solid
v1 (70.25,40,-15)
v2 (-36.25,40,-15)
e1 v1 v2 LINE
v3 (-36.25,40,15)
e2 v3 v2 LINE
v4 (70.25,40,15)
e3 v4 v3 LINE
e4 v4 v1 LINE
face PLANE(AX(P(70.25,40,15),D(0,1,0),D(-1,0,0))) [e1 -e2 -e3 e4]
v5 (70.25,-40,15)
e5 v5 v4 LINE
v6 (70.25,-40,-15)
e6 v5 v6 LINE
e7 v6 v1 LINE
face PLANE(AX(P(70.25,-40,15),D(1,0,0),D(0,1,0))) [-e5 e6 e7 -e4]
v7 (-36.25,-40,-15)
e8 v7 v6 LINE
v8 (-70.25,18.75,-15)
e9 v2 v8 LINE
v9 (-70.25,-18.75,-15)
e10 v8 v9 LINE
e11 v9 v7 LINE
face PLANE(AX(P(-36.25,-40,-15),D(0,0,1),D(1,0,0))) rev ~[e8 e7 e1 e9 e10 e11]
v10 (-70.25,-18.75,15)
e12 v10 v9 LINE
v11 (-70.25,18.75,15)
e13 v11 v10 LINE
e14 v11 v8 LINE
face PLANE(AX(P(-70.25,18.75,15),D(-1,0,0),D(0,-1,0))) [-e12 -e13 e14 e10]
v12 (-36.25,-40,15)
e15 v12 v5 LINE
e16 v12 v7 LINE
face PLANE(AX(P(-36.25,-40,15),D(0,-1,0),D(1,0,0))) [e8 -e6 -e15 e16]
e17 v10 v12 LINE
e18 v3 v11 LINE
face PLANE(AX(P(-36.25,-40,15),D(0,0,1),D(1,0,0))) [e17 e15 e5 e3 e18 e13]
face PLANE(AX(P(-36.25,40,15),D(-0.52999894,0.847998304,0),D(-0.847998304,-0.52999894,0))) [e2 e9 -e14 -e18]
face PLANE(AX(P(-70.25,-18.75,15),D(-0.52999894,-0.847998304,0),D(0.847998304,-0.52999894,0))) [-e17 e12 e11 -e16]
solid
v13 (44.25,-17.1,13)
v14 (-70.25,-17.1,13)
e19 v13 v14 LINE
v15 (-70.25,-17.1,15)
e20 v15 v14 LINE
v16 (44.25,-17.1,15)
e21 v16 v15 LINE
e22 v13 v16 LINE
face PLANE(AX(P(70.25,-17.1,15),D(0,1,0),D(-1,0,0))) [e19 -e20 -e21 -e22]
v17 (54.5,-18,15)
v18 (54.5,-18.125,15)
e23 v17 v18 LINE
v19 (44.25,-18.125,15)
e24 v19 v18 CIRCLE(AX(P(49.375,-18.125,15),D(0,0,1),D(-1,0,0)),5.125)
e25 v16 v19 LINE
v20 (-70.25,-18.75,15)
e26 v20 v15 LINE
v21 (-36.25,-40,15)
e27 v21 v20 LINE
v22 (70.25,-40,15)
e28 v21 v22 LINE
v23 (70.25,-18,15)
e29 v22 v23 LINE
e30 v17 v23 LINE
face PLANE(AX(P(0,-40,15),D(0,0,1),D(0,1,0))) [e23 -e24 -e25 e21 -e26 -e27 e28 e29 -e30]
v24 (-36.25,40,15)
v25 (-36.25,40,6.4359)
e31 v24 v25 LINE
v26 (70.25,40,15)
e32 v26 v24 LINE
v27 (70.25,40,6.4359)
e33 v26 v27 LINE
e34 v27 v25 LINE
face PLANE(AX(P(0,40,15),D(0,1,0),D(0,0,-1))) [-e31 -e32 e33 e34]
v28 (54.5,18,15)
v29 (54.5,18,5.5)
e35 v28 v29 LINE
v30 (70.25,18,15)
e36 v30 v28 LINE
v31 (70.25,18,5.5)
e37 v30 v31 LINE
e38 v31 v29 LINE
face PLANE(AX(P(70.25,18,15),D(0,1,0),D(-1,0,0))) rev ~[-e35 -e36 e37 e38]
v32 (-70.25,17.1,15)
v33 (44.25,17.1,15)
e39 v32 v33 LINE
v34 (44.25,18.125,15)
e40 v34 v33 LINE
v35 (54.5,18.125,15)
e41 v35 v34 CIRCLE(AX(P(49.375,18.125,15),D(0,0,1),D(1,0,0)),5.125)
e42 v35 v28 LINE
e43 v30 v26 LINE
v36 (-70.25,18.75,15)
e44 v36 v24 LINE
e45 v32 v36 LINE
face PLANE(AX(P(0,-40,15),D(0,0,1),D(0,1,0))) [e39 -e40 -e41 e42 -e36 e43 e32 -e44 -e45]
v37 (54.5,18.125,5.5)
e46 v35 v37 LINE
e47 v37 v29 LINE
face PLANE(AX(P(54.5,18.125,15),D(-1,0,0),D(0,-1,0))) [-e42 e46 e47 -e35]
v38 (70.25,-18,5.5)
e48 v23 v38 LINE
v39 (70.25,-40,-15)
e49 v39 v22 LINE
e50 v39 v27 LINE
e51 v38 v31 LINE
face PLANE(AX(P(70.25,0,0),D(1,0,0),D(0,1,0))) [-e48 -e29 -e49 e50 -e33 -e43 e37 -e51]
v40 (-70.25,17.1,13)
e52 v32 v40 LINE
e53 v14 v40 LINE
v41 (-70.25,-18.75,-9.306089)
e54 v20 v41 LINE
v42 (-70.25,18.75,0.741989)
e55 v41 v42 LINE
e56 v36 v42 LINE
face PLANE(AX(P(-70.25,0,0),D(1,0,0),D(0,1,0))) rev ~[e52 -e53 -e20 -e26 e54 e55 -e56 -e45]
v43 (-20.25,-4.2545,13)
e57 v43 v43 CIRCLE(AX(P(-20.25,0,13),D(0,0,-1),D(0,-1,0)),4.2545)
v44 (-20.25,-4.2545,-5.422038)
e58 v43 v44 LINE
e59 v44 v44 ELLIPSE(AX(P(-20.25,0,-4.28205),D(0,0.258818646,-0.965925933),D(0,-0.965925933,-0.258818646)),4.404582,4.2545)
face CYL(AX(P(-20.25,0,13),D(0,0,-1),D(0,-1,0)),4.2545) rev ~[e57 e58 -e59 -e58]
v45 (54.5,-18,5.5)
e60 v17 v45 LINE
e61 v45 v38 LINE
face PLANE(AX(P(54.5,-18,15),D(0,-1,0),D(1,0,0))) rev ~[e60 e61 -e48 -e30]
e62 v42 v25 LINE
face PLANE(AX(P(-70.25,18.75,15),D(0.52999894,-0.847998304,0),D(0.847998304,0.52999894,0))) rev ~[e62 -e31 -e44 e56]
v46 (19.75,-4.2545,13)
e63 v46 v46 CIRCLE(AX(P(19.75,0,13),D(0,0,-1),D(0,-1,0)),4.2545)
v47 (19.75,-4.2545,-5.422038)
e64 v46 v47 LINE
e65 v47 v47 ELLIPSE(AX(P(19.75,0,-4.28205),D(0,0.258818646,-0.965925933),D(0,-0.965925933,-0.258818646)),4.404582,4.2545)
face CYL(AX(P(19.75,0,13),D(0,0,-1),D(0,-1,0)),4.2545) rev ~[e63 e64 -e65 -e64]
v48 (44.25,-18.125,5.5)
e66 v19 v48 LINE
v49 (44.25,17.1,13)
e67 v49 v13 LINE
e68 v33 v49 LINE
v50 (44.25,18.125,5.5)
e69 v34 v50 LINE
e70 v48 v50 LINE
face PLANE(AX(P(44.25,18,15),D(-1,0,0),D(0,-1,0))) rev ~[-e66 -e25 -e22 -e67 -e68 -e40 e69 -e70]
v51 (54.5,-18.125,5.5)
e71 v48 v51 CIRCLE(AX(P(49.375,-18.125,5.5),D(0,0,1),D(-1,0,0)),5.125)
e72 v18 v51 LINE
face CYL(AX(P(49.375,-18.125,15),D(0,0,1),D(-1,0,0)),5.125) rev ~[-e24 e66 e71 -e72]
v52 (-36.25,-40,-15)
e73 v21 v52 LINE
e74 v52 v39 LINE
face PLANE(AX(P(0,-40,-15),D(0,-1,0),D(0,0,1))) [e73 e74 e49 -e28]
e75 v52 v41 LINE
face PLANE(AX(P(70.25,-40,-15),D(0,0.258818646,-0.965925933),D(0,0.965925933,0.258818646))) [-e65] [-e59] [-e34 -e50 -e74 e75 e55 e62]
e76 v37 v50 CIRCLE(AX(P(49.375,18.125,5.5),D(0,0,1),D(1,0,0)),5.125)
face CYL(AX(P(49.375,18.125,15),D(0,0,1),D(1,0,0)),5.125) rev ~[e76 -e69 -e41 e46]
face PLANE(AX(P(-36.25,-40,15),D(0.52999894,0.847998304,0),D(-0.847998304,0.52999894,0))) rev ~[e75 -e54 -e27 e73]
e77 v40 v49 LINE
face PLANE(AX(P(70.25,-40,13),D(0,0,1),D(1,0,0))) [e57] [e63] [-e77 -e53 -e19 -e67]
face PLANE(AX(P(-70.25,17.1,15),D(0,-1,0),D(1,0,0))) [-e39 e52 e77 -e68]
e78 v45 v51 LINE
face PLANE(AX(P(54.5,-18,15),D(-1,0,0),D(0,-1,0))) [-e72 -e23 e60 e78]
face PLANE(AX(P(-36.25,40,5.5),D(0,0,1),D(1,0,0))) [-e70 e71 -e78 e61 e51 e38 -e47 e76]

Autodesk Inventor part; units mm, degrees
ref_plane "Work Plane1" through (-36.25, -40, 32.5387) normal (0, 0, -1) x (-1, 0, 0)
ref_plane "Work Plane2" through (76.2, 29.3539, 8.396) normal (0, 0, 1) x (0, -1, 0)
ref_plane "Work Plane3" through (76.2, -6.1938, -1.129) normal (0, 0, 1) x (0, -1, 0)
sketch "Sketch1" plane through (0, 0, 0) normal (1, 0, 0) x (0, 1, 0)
  line L0 (-40, 15) -> (40, 15)
  line L1 (40, 15) -> (40, -15)
  line L2 (40, -15) -> (-40, -15)
  line L3 (-40, -15) -> (-40, 15)
  line L4 (-40, 15) -> (40, -15) construction
  line L5 (40, 15) -> (-40, -15) construction
  point P0 (0, 0)
  dimension "d0" = 30
  dimension "d1" = 80
extrude "Extrusion1" add sketch "Sketch1" along normal mid plane 140.5
sketch "Sketch2" plane through (-70.25, -40, 15) normal (0, 0, 1) x (1, 0, 0)
  line L0 (140.5, 80) -> (0, 80) construction
  line L1 (0, 0) -> (0, 80) construction
  line L2 (0, 80) -> (0, 58.75)
  line L3 (0, 58.75) -> (34, 80)
  line L4 (34, 80) -> (0, 80)
  line L5 (0, 21.25) -> (0, 0)
  line L6 (0, 0) -> (34, 0)
  line L7 (34, 0) -> (0, 21.25)
  point P0 (70.25, 40)
  dimension "d4" = 37.5
  dimension "d5" = 106.5
  dimension "d6" = 147.995
extrude "Extrusion2" cut sketch "Sketch2" against normal through all
sketch "Sketch3" plane through (70.25, -40, 15) normal (0, 0, 1) x (1, 0, 0)
  line L0 (0, 80) -> (0, 0) construction
  line L1 (-140.5, 21.25) -> (-140.5, 58.75) construction
  line L2 (-140.5, 57.1) -> (0, 57.1)
  line L3 (0, 57.1) -> (0, 22.9)
  line L4 (0, 22.9) -> (-140.5, 22.9)
  line L5 (-140.5, 22.9) -> (-140.5, 57.1)
  point P0 (-70.25, 40)
  point P1 (-140.5, 40)
  dimension "d9" = 34.2
extrude "Extrusion3" cut sketch "Sketch3" against normal blind 2
sketch "Sketch4" plane through (-36.25, 40, 15) normal (0, 0, 1) x (1, 0, 0)
  line L0 (106.5, -57.1) -> (-34, -57.1) construction
  line L1 (-34, -58.75) -> (-34, -57.1) construction
  line L2 (-34, -58.75) -> (0, -80) construction
  line L3 (0, -80) -> (106.5, -80) construction
  line L4 (106.5, -57.1) -> (106.5, -80) construction
  line L5 (-34, -22.9) -> (106.5, -22.9) construction
  line L6 (-34, -57.1) -> (-34, -22.9) construction
  line L7 (106.5, -57.1) -> (-34, -57.1) construction
  line L8 (106.5, -22.9) -> (106.5, -57.1) construction
  line L9 (106.5, -22) -> (80.5, -22)
  line L10 (80.5, -22) -> (80.5, -58)
  line L11 (80.5, -58) -> (106.5, -58)
  line L12 (106.5, -58) -> (106.5, -22)
  line L13 (85.625, -21.875) -> (85.625, -58.125) construction
  line L14 (90.75, -21.875) -> (90.75, -58.125)
  line L15 (80.5, -58.125) -> (80.5, -21.875)
  arc A0 (90.75, -21.875) -> (80.5, -21.875) centre (85.625, -21.875) ccw
  arc A1 (80.5, -58.125) -> (90.75, -58.125) centre (85.625, -58.125) ccw
  point P0 (36.25, -40)
  point P1 (106.5, -40)
  point P2 (85.625, -40)
  point P3 (80.5, -40)
  dimension "d12" = 36
  dimension "d13" = 26
  dimension "d14" = 46.5
  dimension "d15" = 15.75
extrude "Extrusion4" cut sketch "Sketch4" against normal blind 9.5
sketch "Sketch5" plane through (70.25, -40, 13) normal (0, 0, 1) x (1, 0, 0)
  line L0 (-26, 22.9) -> (-26, 57.1) construction
  line L1 (-15.75, 58) -> (0, 58) construction
  line L2 (-15.75, 58.125) -> (-15.75, 58) construction
  arc A0 (-15.75, 58.125) -> (-26, 58.125) centre (-20.875, 58.125) ccw construction
  line L3 (-26, 21.875) -> (-26, 58.125) construction
  arc A1 (-26, 21.875) -> (-15.75, 21.875) centre (-20.875, 21.875) ccw construction
  line L4 (-15.75, 22) -> (-15.75, 21.875) construction
  line L5 (0, 22) -> (-15.75, 22) construction
  line L6 (0, 58) -> (0, 22) construction
  line L7 (-90.5, 40) -> (-50.5, 40)
  circle A2 centre (-90.5, 40) radius 4.25
  circle A3 centre (-50.5, 40) radius 4.25
  point P0 (-70.25, 40)
  dimension "d18" = 8.5
  dimension "d19" = 48.5
  dimension "d20" = 20.25
  dimension "d23" = 50.5
  dimension "d24" = 40
hole "Hole1" at (-20.25, 0, 13) at (19.75, 0, 13) direction (0, 0, -1) diameter 8.509 end through all
sketch "Sketch6" plane through (70.25, 0, 0) normal (1, 0, 0) x (0, 0, -1)
  line L0 (15, -40) -> (15, 40) construction
  line L1 (15, 40) -> (-15, 40) construction
  line L2 (15, -40) -> (-6.4359, 40)
  line L3 (-6.4359, 40) -> (15, 40)
  line L4 (15, 40) -> (15, -40)
  point P0 (0, 0)
  dimension "d32" = 15
extrude "Extrusion5" cut sketch "Sketch6" against normal through all
sketch "Sketch7" plane through (-36.25, -40, 15) normal (0, 0, 1) x (1, 0, 0)
  line L0 (80.5, 57.1) -> (80.5, 58.125) construction
  arc A0 (90.75, 58.125) -> (80.5, 58.125) centre (85.625, 58.125) ccw construction
  line L1 (90.75, 58.125) -> (90.75, 58) construction
  line L2 (90.75, 58) -> (106.5, 58) construction
  line L3 (106.5, 80) -> (106.5, 58) construction
  line L4 (106.5, 80) -> (0, 80) construction
  line L5 (0, 80) -> (-34, 58.75) construction
  line L6 (-34, 57.1) -> (-34, 58.75) construction
  line L7 (-34, 57.1) -> (80.5, 57.1) construction
  line L8 (106.5, 80) -> (0, 80) construction
  line L9 (106.5, 0) -> (106.5, 80)
  line L10 (106.5, 80) -> (0, 80) construction
  line L11 (106.5, 80) -> (0, 80)
  line L12 (0, 80) -> (-34, 58.75)
  line L13 (0, 80) -> (-34, 58.75) construction
  line L14 (-34, 58.75) -> (-34, 21.25)
  line L15 (-34, 21.25) -> (0, 0)
  line L16 (106.5, 0) -> (106.5, 80) construction
  line L17 (0, 0) -> (106.5, 0)
  point P0 (36.25, 40)
extrude "Extrusion6" add sketch "Sketch7" against normal up to surface (30 mm away) separate body
sketch "Sketch8" plane through (70.25, -40, 13) normal (0, 0, 1) x (1, 0, 0)
  circle A0 centre (-90.5, 40) radius 4.2545 construction
  circle A1 centre (-50.5, 40) radius 4.2545 construction
  line L0 (-26, 22.9) -> (-26, 57.1) construction
  line L1 (-140.5, 57.1) -> (-26, 57.1) construction
  line L2 (-140.5, 22.9) -> (-140.5, 57.1) construction
  line L3 (-26, 22.9) -> (-140.5, 22.9) construction
  line L4 (0, 58) -> (0, 22) construction
  line L5 (12.7, 57.1) -> (-162.725, 57.1)
  line L6 (-162.725, 57.1) -> (-162.725, 22.9)
  line L7 (-162.725, 22.9) -> (12.7, 22.9)
  line L8 (-140.5, 58.75) -> (-140.5, 21.25) projected
  line L9 (-140.5, 40) -> (0, 40)
  point P0 (-70.25, 40)
  dimension "d39" = 22.225
  dimension "d40" = 12.7
sketch "Sketch9" plane through (70.25, 40, 6.4359) normal (0, 0.258819, -0.9659258) x (-1, 0, 0)
  line L0 (140.5, -60.8225) -> (106.5, -82.8221) construction
  line L1 (140.5, -21.9996) -> (140.5, -60.8225) construction
  line L2 (106.5, 0) -> (140.5, -21.9996) construction
  line L3 (0, 0) -> (106.5, 0) construction
  line L4 (0, -82.8221) -> (0, 0) construction
  line L5 (0, -82.8221) -> (106.5, -82.8221) construction
  ellipse E0 centre (90.5, -41.411) end of major axis (90.5, -37.0065) minor radius 4.2545 construction
  ellipse E1 centre (50.5, -41.411) end of major axis (50.5, -37.0065) minor radius 4.2545 construction
  line L6 (0, -41.411) -> (140.5, -41.411)
  line L7 (0, -40.141) -> (140.5, -40.141)
  line L8 (140.5, -53.4555) -> (140.5, -20.4208) projected
  line L9 (0, -47.761) -> (140.5, -47.761)
  point P0 (70.25, -40.3028)
  dimension "d104" = 6.35
  dimension "d105" = 1.27
sketch "Sketch10" plane through (-36.25, -40, 15) normal (0, 0, 1) x (1, 0, 0)
  line L0 (80.5, 57.1) -> (80.5, 58.125) construction
  arc A0 (90.75, 58.125) -> (80.5, 58.125) centre (85.625, 58.125) ccw construction
  line L1 (90.75, 58.125) -> (90.75, 58) construction
  line L2 (90.75, 58) -> (106.5, 58) construction
  line L3 (106.5, 80) -> (106.5, 58) construction
  line L4 (106.5, 80) -> (0, 80) construction
  line L5 (0, 80) -> (-34, 58.75) construction
  line L6 (-34, 57.1) -> (-34, 58.75) construction
  line L7 (-34, 57.1) -> (80.5, 57.1) construction
  line L8 (90.75, 58) -> (106.5, 58) construction
  line L9 (90.75, 58.125) -> (90.75, 58) construction
  arc A1 (90.75, 58.125) -> (80.5, 58.125) centre (85.625, 58.125) ccw construction
  line L10 (80.5, 21.875) -> (80.5, 58.125) construction
  arc A2 (80.5, 21.875) -> (90.75, 21.875) centre (85.625, 21.875) ccw construction
  line L11 (90.75, 22) -> (90.75, 21.875) construction
  line L12 (106.5, 22) -> (90.75, 22) construction
  line L13 (106.5, 58) -> (106.5, 22) construction
  circle A3 centre (16, 40) radius 4.2545 construction
  circle A4 centre (56, 40) radius 4.2545 construction
  line L14 (80.5, 22.9) -> (80.5, 57.1) construction
  line L15 (-34, 57.1) -> (80.5, 57.1) construction
  line L16 (-34, 22.9) -> (-34, 57.1) construction
  line L17 (80.5, 22.9) -> (-34, 22.9) construction
  line L18 (112.45, 94.0004) -> (-39.95, 94.0004)
  line L19 (-39.95, 94.0004) -> (-39.95, -14.0004)
  line L20 (-39.95, -14.0004) -> (112.45, -14.0004)
  line L21 (112.45, -14.0004) -> (112.45, 94.0004)
  line L22 (-34, 40) -> (106.5, 40) construction
  line L23 (112.45, 94.0004) -> (-39.95, -14.0004) construction
  point P0 (36.25, 40)
  point P1 (36.25, 40)
  dimension "d41" = 152.4
  dimension "d42" = 108.0008
sketch "Sketch13" plane through (76.2, -54.0004, 15) normal (1, 0, 0) x (0, 0, -1)
  line L0 (0, 0) -> (0, 108.0008) construction
  line L1 (0, 0) -> (-36.8046, 0) construction
  line L2 (-10.5083, 0) -> (-36.8046, 98.139)
  line L3 (30, 14.0004) -> (8.5641, 94.0004) construction
  line L4 (-36.8046, 108.0008) -> (-36.8046, 0)
  line L5 (-10.5083, 0) -> (-36.8046, 0)
  line L6 (-36.8046, 0) -> (-36.8046, 108.0008) construction
  line L7 (0, 108.0008) -> (-36.8046, 98.139)
  line L8 (0, 108.0008) -> (-36.8046, 108.0008)
  line L9 (-10.5083, 0) -> (0, 2.8157)
  line L10 (0, 2.8157) -> (0, 0)
  line L11 (0, 0) -> (-10.5083, 0)
  line L12 (-36.8046, 98.139) -> (-10.5083, 0)
  line L13 (-10.5083, 0) -> (-36.8046, 0)
  line L14 (-36.8046, 0) -> (-36.8046, 98.139)
  line L15 (0, 108.0008) -> (-36.8046, 108.0008) construction
  line L16 (0, 108.0008) -> (-36.8046, 98.139)
  line L17 (-36.8046, 98.139) -> (-36.8046, 108.0008)
  line L18 (-36.8046, 108.0008) -> (0, 108.0008)
  point P0 (15, 54.0004)
  dimension "d67" = 101.601
  dimension "d75" = 38.1029
sketch "Sketch12" plane through (-36.25, -40, 51.8046) normal (0, 0, 1) x (1, 0, 0)
  circle A0 centre (16, 40) radius 4.2545 construction
  circle A1 centre (56, 40) radius 4.2545 construction
  line L0 (80.5, 22.9) -> (80.5, 57.1) construction
  line L1 (-34, 57.1) -> (80.5, 57.1) construction
  line L2 (-34, 22.9) -> (-34, 57.1) construction
  line L3 (80.5, 22.9) -> (-34, 22.9) construction
  point P0 (36.25, 40)
sketch "Sketch15" plane through (-36.25, -40, 32.5387) normal (0, 0, -1) x (-1, 0, 0)
  circle A0 centre (-56, 40) radius 5.4991 construction
  circle A1 centre (-16, 40) radius 5.4991 construction
  line L0 (9.4, 65.4) -> (-81.4, 65.4)
  line L1 (-81.4, 65.4) -> (-81.4, -10.8)
  line L2 (-81.4, -10.8) -> (9.4, -10.8)
  line L3 (9.4, -10.8) -> (9.4, 65.4)
  line L4 (9.4, 65.4) -> (-81.4, -10.8) construction
  line L5 (-81.4, 65.4) -> (9.4, -10.8) construction
  point P0 (-36, 27.3)
  dimension "d76" = 25.4
  dimension "d77" = 25.4
  dimension "d78" = 25.4
  dimension "d79" = 50.8
sketch "Sketch17" plane through (76.2, -51.1847, 15) normal (1, 0, 0) x (0, 0, -1)
  line L0 (-10.5083, -2.8157) -> (0, 0) projected
  line L1 (0, 0) -> (0, 105.1851) projected
  line L2 (0, 105.1851) -> (-36.8046, 95.3233) projected
  line L3 (-36.8046, 95.3233) -> (-10.5083, -2.8157) projected
  line L4 (0, 0) -> (26.2963, 7.0461)
  line L5 (26.2963, 7.0461) -> (0, 105.1851)
  point P0 (15, 51.1847)
  dimension "d94" = 0.254
  dimension "d95" = 9.525
  dimension "d101" = 25.4
  dimension "d102" = 25.4
  dimension "d103" = 82.55
equation "\"d102\" = d101"
equation "\"BendRadius\" = Thickness"
equation "\"BendReliefWidth\" = 0.5 * Thickness"
equation "\"BendReliefDepth\" = 0.5 * Thickness"
equation "\"CornerReliefSize\" = 4 * Thickness"
equation "\"MinimumRemnant\" = 2 * Thickness"
equation "\"TransitionRadius\" = BendRadius"
equation "\"JacobiRadiusSize\" = BendRadius"
equation "\"Thickness\" = 6.35"
properties part number "SLANT PADDLE 5.375''" material "A36"
